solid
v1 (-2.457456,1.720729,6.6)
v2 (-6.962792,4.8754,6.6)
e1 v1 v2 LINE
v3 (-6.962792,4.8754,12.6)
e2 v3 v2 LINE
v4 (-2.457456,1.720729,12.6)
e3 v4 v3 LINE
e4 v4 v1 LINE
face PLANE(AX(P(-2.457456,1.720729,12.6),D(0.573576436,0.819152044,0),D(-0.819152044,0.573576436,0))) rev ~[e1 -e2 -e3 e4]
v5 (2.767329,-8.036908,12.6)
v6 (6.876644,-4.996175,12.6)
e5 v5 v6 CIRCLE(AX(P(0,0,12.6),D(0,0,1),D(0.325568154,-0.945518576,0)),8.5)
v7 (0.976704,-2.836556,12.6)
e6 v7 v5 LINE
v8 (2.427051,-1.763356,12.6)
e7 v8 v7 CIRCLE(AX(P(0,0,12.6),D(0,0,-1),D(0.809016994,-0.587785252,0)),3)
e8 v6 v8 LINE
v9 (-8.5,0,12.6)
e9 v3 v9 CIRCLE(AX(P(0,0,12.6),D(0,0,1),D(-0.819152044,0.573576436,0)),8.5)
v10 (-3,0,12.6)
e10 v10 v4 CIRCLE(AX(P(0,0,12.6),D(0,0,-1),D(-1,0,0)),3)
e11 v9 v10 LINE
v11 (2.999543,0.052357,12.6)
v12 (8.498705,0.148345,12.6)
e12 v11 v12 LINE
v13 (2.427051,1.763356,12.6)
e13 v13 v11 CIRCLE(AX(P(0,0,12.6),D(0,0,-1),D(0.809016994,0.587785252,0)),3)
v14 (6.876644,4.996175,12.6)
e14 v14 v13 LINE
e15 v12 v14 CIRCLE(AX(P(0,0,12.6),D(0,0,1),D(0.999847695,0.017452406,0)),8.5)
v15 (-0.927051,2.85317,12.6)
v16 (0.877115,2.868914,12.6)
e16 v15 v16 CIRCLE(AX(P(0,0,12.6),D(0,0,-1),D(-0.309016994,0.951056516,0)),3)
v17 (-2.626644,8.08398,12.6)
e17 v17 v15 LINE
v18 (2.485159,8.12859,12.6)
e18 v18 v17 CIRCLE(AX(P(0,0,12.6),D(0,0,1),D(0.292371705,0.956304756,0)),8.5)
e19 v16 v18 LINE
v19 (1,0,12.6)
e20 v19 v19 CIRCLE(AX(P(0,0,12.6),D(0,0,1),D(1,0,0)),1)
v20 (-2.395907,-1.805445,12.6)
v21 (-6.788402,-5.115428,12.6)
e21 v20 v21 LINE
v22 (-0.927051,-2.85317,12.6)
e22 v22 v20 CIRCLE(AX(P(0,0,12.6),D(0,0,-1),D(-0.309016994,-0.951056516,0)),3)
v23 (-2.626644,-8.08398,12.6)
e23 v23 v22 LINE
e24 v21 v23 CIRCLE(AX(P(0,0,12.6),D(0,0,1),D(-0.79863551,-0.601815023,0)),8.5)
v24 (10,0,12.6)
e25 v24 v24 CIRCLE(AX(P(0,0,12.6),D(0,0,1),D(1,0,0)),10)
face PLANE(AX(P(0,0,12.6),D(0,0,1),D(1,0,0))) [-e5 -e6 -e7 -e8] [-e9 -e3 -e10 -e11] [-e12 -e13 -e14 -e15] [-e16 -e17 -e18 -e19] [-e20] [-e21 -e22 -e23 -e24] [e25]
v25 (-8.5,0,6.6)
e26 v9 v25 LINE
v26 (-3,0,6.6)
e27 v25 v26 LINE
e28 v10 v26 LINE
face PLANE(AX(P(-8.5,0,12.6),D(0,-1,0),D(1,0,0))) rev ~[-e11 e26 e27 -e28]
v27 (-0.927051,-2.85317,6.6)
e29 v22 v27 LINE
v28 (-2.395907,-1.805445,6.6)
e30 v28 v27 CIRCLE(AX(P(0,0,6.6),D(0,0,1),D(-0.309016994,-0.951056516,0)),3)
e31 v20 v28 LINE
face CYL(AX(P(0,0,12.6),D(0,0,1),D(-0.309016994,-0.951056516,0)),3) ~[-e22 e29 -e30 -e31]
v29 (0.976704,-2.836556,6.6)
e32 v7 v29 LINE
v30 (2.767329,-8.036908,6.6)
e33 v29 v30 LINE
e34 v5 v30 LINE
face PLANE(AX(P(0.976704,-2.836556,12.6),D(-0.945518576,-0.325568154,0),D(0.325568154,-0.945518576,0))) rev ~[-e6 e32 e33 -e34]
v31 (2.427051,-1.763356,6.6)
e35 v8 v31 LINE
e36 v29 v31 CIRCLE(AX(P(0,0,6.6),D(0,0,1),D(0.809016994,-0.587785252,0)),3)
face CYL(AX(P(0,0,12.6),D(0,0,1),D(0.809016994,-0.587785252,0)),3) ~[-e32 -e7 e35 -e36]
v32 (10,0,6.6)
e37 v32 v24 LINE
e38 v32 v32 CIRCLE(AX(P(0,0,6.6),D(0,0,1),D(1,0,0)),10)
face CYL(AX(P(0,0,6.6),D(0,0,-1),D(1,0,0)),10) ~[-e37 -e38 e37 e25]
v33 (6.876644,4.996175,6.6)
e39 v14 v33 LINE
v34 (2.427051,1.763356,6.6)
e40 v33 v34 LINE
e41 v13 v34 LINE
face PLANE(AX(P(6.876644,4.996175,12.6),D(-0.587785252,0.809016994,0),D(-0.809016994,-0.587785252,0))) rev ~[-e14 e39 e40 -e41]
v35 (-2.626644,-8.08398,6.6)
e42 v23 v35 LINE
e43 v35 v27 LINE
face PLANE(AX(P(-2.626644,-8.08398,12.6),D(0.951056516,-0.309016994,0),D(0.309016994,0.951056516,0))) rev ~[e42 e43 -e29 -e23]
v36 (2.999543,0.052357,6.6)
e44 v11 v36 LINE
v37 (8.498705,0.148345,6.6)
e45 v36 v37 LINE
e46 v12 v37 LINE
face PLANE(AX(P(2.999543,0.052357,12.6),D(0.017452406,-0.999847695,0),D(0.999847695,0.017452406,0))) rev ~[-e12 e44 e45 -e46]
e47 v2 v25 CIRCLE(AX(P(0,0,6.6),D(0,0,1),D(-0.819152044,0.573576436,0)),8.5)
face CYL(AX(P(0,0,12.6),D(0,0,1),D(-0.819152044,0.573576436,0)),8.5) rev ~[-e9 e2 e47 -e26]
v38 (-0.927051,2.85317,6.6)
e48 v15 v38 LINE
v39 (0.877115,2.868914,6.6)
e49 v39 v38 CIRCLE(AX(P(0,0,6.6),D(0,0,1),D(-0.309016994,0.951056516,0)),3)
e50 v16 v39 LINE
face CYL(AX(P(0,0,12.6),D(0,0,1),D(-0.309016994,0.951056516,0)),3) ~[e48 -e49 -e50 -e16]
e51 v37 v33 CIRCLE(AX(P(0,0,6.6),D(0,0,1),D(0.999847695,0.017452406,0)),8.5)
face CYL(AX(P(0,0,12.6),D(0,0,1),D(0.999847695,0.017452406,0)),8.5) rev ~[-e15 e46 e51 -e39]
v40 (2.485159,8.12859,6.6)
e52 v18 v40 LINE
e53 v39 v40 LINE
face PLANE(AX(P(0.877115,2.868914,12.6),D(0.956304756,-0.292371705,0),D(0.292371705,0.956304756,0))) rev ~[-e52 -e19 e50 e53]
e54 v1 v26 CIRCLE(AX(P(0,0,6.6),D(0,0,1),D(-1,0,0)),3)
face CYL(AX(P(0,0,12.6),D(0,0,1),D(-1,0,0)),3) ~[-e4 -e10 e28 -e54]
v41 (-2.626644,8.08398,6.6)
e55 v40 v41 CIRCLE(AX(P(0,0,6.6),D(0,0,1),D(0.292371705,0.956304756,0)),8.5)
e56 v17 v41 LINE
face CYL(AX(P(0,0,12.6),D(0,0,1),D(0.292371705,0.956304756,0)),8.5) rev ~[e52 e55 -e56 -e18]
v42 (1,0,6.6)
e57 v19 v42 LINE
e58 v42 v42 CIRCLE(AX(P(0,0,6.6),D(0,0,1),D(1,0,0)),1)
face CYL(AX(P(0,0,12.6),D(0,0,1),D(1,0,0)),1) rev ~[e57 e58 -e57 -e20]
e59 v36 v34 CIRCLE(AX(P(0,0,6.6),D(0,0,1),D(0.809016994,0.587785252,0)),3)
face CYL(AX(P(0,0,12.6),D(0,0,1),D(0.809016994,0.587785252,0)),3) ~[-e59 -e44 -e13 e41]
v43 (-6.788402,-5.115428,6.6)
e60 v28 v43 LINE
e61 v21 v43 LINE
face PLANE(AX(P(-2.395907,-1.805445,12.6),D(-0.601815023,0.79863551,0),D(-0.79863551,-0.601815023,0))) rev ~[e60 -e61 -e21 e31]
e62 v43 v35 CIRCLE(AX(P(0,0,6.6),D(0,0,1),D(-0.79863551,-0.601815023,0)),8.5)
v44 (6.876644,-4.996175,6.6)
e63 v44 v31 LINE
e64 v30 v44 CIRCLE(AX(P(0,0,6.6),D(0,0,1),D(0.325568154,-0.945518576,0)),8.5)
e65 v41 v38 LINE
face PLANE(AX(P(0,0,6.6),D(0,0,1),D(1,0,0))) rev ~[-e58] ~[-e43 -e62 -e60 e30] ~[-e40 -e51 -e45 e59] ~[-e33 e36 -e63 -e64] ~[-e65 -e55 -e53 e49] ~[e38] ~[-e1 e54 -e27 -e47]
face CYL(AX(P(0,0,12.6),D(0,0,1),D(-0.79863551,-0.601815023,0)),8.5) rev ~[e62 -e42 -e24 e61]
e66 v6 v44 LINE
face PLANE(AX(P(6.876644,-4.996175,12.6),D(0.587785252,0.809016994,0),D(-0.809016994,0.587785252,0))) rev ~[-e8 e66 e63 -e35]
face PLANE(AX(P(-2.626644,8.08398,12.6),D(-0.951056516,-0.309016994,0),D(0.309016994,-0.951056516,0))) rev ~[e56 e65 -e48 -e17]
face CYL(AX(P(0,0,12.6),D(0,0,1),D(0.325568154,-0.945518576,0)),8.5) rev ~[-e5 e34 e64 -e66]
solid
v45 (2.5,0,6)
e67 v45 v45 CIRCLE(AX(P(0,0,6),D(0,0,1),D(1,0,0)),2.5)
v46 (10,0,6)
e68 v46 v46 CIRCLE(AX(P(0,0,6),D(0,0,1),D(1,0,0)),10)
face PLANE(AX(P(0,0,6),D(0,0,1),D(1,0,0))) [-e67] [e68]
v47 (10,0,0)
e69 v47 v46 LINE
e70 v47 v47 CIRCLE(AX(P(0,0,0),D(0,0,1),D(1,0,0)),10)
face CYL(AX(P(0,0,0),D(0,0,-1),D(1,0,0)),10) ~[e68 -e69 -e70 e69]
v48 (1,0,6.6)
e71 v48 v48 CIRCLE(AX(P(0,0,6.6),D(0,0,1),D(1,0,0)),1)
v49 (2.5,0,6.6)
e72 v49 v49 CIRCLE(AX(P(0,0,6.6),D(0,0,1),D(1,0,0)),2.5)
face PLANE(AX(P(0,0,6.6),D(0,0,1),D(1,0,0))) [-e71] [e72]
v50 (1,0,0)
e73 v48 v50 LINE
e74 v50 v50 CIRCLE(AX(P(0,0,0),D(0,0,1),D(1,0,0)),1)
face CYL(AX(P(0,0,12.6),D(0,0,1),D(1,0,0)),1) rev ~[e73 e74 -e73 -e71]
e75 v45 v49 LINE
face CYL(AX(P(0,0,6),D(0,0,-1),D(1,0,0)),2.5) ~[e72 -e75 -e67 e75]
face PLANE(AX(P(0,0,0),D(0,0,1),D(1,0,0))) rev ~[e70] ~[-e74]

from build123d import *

# Parameters (mm, degrees)
F0_R     = 10
F1_DEPTH = 6
F2_R     = 2.5
F3_DEPTH = 0.6
F4_R     = 10
F5_DEPTH = 6
F6_R     = 1
F7_DEPTH = 25
F9_DEPTH = 12.601


with BuildPart() as f1:
    # F0 (on Top) → F1 (new body)
    with BuildSketch(Plane.XY):
        Circle(F0_R)
    extrude(amount=F1_DEPTH)

    # F2 (on face) → F3 (join)
    with BuildSketch(Plane.XY.offset(6)):
        Circle(F2_R)
    extrude(amount=F3_DEPTH)


with BuildPart() as f5:
    # F4 (on face) → F5 (new body)
    with BuildSketch(Plane.XY.offset(6.6)):
        Circle(F4_R)
    extrude(amount=F5_DEPTH)


with BuildPart() as f7_tool:
    # F6 (on face) → F7 (new body)
    with BuildSketch(Plane.XY.offset(12.6)):
        Circle(F6_R)
    extrude(amount=-F7_DEPTH)


with BuildPart() as f1_1:
    add(f1.part)

    # F7: cut by f7_tool
    add(f7_tool.part, mode=Mode.SUBTRACT)


with BuildPart() as f5_1:
    add(f5.part)

    # F7: cut by f7_tool
    add(f7_tool.part, mode=Mode.SUBTRACT)

    # F8 (on face) → F9 (cut, through all)
    with BuildSketch(Plane.XY.offset(12.6)):
        with BuildLine():
            Line((-8.5, 0), (-3, 0))
            ThreePointArc((-3, 0), (-2.8611508522, 0.9021173985), (-2.4574561329, 1.7207293091))
            Line((-2.4574561329, 1.7207293091), (-6.9627923765, 4.875399709))
            ThreePointArc((-6.9627923765, 4.875399709), (-8.1065940814, 2.5559992958), (-8.5, 0))
        make_face()
        with BuildLine():
            Line((-2.3959065301, -1.8054450695), (-6.7884018354, -5.1154276968))
            ThreePointArc((-6.7884018354, -5.1154276968), (-4.9359751235, -6.919981906), (-2.6266444522, -8.0839803885))
            Line((-2.6266444522, -8.0839803885), (-0.9270509831, -2.8531695489))
            ThreePointArc((-0.9270509831, -2.8531695489), (-1.7421088671, -2.4423465551), (-2.3959065301, -1.8054450695))
        make_face()
        with BuildLine():
            Line((0.9767044634, -2.8365557268), (2.7673293129, -8.0369078926))
            ThreePointArc((2.7673293129, -8.0369078926), (5.0559936874, -6.8327833152), (6.8766444522, -4.9961746445))
            Line((6.8766444522, -4.9961746445), (2.4270509831, -1.7633557569))
            ThreePointArc((2.4270509831, -1.7633557569), (1.7844683603, -2.4115705819), (0.9767044634, -2.8365557268))
        make_face()
        with BuildLine():
            Line((2.9995430855, 0.0523572193), (8.4987054088, 0.1483454547))
            ThreePointArc((8.4987054088, 0.1483454547), (8.0607510693, 2.6970895794), (6.8766444522, 4.9961746445))
            Line((6.8766444522, 4.9961746445), (2.4270509831, 1.7633557569))
            ThreePointArc((2.4270509831, 1.7633557569), (2.8449709656, 0.9519139692), (2.9995430855, 0.0523572193))
        make_face()
        with BuildLine():
            Line((0.8771151142, 2.8689142679), (2.4851594901, 8.1285904257))
            ThreePointArc((2.4851594901, 8.1285904257), (-0.0741755517, 8.499676346), (-2.6266444522, 8.0839803885))
            Line((-2.6266444522, 8.0839803885), (-0.9270509831, 2.8531695489))
            ThreePointArc((-0.9270509831, 2.8531695489), (-0.0261796065, 2.9998857692), (0.8771151142, 2.8689142679))
        make_face()
    extrude(amount=-F9_DEPTH, mode=Mode.SUBTRACT)


solid = Compound([f1_1.part, f5_1.part])
